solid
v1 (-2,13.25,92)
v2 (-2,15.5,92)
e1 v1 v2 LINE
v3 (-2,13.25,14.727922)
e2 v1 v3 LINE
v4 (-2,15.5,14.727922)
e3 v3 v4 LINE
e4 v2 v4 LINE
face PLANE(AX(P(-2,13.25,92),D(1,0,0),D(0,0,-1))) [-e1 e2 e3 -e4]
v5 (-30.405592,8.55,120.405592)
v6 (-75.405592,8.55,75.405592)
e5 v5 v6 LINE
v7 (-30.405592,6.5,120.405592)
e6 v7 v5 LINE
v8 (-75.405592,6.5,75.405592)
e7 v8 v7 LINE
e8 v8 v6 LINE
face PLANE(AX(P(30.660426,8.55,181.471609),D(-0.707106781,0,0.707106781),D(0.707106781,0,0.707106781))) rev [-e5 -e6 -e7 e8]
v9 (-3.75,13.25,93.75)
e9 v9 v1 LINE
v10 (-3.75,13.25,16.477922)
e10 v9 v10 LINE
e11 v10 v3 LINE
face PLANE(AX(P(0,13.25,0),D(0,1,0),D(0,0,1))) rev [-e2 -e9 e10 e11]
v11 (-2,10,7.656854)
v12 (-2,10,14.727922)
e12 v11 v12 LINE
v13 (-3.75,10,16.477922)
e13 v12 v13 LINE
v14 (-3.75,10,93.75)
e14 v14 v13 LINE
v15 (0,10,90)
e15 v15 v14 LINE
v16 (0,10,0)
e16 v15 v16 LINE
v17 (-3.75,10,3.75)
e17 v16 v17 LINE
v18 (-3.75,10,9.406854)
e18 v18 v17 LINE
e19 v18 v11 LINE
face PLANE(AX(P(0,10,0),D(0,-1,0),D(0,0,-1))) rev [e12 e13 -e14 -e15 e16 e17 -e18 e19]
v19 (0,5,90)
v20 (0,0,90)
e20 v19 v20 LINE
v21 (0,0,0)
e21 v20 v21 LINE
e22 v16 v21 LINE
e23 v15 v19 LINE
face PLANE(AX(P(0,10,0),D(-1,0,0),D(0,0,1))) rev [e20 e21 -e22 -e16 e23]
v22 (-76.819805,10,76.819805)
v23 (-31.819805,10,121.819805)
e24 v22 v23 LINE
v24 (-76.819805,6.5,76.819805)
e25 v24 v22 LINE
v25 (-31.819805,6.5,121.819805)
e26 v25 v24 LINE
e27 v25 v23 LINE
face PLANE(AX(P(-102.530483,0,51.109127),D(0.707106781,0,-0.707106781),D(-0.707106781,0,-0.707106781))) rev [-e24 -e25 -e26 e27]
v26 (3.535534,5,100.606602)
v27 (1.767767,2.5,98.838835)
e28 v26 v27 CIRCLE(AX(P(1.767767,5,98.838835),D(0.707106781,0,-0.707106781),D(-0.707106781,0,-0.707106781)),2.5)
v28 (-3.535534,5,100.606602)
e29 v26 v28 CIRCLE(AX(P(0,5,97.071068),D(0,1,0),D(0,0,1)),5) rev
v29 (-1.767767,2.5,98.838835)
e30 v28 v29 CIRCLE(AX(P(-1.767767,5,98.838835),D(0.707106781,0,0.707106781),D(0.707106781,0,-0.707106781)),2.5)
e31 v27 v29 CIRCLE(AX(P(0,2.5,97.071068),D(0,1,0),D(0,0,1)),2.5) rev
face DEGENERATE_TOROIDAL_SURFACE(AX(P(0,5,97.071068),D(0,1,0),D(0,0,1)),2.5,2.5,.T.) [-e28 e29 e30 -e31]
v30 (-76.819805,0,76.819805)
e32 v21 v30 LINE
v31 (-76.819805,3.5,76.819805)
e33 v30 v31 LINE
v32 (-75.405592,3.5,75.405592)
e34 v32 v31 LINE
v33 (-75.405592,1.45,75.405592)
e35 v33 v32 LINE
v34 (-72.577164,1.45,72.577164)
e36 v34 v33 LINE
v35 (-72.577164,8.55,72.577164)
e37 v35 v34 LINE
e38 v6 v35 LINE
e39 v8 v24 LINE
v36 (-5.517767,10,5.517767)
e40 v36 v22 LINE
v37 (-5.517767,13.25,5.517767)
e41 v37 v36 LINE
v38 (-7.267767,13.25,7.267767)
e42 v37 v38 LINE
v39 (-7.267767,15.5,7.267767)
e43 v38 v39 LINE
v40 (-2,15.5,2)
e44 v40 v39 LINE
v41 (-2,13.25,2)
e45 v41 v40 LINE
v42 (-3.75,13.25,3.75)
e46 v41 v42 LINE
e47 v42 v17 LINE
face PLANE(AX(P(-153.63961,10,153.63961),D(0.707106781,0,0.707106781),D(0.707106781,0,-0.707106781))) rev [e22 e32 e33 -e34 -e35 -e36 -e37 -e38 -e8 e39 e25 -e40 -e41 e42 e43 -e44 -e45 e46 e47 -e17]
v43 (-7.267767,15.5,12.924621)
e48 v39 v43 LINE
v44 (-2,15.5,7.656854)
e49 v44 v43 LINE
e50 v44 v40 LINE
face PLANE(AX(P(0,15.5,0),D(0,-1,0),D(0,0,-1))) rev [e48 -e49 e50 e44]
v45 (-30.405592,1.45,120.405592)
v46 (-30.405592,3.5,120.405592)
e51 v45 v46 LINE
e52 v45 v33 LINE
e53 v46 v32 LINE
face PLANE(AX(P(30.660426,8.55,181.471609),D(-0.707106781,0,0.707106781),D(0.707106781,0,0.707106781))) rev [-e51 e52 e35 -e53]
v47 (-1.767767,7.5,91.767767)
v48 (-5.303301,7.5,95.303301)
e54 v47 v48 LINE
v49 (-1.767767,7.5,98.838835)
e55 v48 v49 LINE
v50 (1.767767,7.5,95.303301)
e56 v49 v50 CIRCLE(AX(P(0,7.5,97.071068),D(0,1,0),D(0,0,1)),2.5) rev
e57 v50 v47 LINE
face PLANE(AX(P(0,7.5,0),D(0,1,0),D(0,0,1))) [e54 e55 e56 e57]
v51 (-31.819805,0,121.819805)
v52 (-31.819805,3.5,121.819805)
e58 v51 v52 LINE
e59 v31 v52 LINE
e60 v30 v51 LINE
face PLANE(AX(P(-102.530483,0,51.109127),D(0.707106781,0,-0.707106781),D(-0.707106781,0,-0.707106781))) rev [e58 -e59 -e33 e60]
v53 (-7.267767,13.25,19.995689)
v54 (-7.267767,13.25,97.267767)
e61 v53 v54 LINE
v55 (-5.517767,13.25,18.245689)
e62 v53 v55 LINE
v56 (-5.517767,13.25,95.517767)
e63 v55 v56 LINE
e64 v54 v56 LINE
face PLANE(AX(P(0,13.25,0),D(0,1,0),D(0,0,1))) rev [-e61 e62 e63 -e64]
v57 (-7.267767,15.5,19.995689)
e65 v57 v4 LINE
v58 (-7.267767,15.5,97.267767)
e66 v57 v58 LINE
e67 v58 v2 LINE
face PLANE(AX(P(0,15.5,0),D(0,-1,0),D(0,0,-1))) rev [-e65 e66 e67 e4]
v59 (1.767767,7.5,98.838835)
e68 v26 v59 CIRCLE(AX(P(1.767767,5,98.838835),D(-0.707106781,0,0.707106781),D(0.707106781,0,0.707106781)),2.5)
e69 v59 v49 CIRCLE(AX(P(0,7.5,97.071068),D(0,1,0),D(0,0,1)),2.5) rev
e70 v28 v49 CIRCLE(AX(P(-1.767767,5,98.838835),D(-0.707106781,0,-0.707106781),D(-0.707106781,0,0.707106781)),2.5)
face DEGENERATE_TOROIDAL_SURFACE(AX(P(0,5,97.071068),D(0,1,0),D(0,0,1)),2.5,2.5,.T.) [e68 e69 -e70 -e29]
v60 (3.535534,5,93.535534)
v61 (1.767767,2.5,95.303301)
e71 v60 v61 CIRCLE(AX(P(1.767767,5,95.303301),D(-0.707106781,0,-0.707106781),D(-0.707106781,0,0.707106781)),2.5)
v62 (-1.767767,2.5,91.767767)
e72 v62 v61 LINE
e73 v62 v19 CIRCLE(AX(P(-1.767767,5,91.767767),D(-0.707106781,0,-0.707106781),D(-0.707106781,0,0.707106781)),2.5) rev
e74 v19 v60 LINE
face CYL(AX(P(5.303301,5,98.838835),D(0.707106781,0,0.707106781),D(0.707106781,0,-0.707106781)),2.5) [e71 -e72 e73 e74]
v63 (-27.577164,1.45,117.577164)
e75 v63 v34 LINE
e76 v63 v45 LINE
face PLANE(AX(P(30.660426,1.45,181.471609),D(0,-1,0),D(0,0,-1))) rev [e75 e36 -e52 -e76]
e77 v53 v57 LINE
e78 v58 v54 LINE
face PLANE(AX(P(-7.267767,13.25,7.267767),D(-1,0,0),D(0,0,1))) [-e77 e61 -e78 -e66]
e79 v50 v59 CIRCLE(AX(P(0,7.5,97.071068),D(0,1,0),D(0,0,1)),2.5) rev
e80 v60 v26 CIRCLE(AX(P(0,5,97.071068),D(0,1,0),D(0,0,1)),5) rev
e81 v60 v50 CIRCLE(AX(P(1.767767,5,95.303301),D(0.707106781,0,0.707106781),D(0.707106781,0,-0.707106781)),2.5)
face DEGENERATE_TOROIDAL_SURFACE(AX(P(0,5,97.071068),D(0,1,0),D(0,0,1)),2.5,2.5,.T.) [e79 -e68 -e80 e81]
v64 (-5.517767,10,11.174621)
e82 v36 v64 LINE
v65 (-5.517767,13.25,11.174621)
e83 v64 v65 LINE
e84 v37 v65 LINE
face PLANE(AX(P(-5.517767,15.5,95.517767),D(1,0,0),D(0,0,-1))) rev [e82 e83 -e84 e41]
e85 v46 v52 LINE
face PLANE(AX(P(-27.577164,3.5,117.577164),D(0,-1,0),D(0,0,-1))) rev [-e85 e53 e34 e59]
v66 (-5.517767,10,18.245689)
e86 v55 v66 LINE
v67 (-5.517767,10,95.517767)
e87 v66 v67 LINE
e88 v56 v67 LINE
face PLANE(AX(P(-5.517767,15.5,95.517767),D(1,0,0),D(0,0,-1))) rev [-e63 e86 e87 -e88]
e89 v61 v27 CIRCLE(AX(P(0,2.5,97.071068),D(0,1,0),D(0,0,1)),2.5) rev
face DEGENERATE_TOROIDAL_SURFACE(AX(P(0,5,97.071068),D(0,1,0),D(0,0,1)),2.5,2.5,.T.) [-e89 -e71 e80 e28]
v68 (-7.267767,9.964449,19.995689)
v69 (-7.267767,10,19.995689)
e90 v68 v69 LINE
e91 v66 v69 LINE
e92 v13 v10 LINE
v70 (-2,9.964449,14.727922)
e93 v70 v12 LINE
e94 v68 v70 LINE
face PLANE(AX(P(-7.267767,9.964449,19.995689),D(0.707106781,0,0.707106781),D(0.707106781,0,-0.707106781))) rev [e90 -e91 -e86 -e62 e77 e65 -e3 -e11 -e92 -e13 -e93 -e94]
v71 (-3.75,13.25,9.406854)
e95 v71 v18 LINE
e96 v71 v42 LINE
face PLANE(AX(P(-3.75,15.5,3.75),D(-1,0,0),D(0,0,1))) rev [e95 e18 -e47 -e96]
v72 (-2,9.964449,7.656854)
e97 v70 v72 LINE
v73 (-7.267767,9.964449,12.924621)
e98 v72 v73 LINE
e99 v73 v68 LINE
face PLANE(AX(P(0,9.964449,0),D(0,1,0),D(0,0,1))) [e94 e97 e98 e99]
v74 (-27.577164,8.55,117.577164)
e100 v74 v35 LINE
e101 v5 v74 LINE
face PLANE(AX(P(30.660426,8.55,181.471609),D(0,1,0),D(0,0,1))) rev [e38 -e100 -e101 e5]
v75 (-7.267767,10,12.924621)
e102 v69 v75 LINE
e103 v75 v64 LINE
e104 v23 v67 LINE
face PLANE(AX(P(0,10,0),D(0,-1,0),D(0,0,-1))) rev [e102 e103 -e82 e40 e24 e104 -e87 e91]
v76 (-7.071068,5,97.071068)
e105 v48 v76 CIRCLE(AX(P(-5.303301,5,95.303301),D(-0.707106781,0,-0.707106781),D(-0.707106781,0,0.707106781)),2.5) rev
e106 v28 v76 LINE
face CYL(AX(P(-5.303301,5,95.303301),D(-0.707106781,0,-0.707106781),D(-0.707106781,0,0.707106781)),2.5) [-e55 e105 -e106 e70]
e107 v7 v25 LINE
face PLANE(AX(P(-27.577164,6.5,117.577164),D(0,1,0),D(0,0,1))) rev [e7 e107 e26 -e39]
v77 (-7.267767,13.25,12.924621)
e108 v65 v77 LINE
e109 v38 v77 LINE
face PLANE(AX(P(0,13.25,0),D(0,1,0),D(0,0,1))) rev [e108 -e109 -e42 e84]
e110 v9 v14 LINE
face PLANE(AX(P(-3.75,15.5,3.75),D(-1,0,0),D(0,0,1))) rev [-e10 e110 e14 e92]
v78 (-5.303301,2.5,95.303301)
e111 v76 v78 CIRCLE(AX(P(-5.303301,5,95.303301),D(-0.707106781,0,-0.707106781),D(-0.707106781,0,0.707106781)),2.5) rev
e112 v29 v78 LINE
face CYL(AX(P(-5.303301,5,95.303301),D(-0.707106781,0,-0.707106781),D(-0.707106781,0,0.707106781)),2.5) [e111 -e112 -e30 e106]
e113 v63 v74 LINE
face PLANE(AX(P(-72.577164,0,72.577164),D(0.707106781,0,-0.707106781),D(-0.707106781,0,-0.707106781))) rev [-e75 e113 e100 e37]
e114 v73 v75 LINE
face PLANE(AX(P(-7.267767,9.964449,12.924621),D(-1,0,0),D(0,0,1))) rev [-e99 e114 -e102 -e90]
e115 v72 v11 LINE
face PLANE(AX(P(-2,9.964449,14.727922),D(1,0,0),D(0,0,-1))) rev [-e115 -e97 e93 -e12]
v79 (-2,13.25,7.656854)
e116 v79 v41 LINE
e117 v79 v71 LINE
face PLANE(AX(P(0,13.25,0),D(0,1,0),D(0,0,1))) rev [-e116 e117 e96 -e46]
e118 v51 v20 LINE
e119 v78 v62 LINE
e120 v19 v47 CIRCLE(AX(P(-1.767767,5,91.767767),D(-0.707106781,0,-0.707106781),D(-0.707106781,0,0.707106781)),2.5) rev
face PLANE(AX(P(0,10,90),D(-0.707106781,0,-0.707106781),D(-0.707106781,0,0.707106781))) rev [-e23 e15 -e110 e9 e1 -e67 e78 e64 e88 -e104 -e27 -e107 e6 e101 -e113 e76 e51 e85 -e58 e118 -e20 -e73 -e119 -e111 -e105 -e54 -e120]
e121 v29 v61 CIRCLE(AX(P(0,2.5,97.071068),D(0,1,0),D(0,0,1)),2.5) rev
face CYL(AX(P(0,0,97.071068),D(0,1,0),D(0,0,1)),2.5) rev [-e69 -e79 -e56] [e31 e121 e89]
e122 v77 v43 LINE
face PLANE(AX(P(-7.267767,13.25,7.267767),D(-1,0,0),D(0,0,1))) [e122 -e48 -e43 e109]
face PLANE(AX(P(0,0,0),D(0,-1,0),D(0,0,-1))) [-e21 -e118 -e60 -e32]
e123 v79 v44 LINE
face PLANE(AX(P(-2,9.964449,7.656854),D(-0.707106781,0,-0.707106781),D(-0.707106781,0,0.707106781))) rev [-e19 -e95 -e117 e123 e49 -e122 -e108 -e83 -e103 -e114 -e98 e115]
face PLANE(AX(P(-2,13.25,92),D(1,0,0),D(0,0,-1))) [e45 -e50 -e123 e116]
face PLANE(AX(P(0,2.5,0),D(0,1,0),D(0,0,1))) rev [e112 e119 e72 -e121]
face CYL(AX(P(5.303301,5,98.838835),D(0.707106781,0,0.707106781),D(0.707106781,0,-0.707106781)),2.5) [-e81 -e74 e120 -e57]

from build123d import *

# Parameters (mm, degrees)
BOSS_EXTRUDE1_DEPTH = 10
BOSS_EXTRUDE2_DEPTH = 5.5
BOSS_EXTRUDE4_DEPTH = 2.25
SKETCH5_W           = 167.071716414
SKETCH5_H           = 54.025930679
CUT_EXTRUDE1_DEPTH  = 100
BOSS_EXTRUDE5_DEPTH = 5.5
BOSS_EXTRUDE6_DEPTH = 2.25
CUT_EXTRUDE2_DEPTH  = 2.25
CUT_EXTRUDE3_DEPTH  = 5.5
CUT_EXTRUDE4_DEPTH  = 5.5
CUT_EXTRUDE5_DEPTH  = 5.5
CUT_EXTRUDE6_DEPTH  = 5.5
SKETCH14_W          = 63.639610307
SKETCH14_H          = 3
CUT_EXTRUDE7_DEPTH  = 6
SKETCH15_W          = 4
SKETCH15_H          = 7.1
CUT_EXTRUDE8_DEPTH  = 150
SKETCH16_W          = 18.586901627
SKETCH16_H          = 5.5
CUT_EXTRUDE9_DEPTH  = 34
SKETCH17_W          = 2.5
SKETCH17_H          = 5.5
CUT_EXTRUDE10_DEPTH = 34
SKETCH18_W          = 1.498020702
SKETCH18_H          = 5.5
CUT_EXTRUDE11_DEPTH = 34
SKETCH19_W          = 3.248020701
SKETCH19_H          = 2.25
CUT_EXTRUDE12_DEPTH = 34
BOSS_EXTRUDE7_DEPTH = 10
SKETCH21_R          = 2.5
CUT_EXTRUDE13_DEPTH = 10
FILLET1_R           = 5
FILLET2_R           = 5
CUT_EXTRUDE14_DEPTH = 2.5
CUT_EXTRUDE15_DEPTH = 2.5
FILLET6_R           = 2.5
FILLET7_R           = 2.5
CUT_EXTRUDE16_DEPTH = 10
CUT_EXTRUDE17_DEPTH = 5.535550905
SKETCH26_W          = 38.089982304
SKETCH26_H          = 10
BOSS_EXTRUDE8_DEPTH = 50


with BuildPart() as part:
    # Sketch1 → Boss-Extrude1 (new body)
    with BuildSketch(Plane(origin=(0, 0, 0), x_dir=(1, 0, 0), z_dir=(0, 1, 0))):
        Polygon((0, 0), (0, -90), (-63.639610307, -153.639610307), (-153.639610307, -153.639610307), align=None)
    extrude(amount=BOSS_EXTRUDE1_DEPTH)

    # Sketch3 → Boss-Extrude2 (add)
    with BuildSketch(Plane(origin=(0, 10, 0), x_dir=(1, 0, 0), z_dir=(0, 1, 0))):
        Polygon((-3.75, -3.75), (-3.75, -93.75), (-5.517766953, -95.517766953), (-5.517766953, -5.517766953), align=None)
    extrude(amount=BOSS_EXTRUDE2_DEPTH)

    # Sketch4 → Boss-Extrude4 (add)
    with BuildSketch(Plane(origin=(0, 15.5, 0), x_dir=(1, 0, 0), z_dir=(0, 1, 0))):
        Polygon((-3.75, -93.75), (-2, -92), (-2, -2), (-7.267766953, -7.267766953), (-7.267766953, -97.267766953), align=None)
    extrude(amount=-BOSS_EXTRUDE4_DEPTH)

    # Sketch5 → Cut-Extrude1 (cut)
    with BuildSketch(Plane(origin=(45, 0, 45), x_dir=(0.7071067811865487, 0, -0.7071067811865464), z_dir=(0.7071067811865464, 0, 0.7071067811865487))):
        with Locations((-192.175468514, 27.01296534)):
            Rectangle(SKETCH5_W, SKETCH5_H)
    extrude(amount=-CUT_EXTRUDE1_DEPTH, mode=Mode.SUBTRACT)

    # Sketch6 → Boss-Extrude5 (add)
    with BuildSketch(Plane(origin=(0, 10, 0), x_dir=(1, 0, 0), z_dir=(0, 1, 0))):
        Polygon((-7.267766953, -97.267766953), (-27.267766953, -97.267766953), (-41.819805153, -111.819805153), (-43.587572106, -110.0520382), (-28.303300859, -94.767766953), (-7.267766953, -94.767766953), align=None)
    extrude(amount=BOSS_EXTRUDE5_DEPTH)

    # Sketch7 → Boss-Extrude6 (add)
    with BuildSketch(Plane(origin=(0, 15.5, 0), x_dir=(1, 0, 0), z_dir=(0, 1, 0))):
        Polygon((-7.267766953, -94.767766953), (-7.267766953, -93.017766953), (-29.028174593, -93.017766953), (-44.822087786, -108.811680146), (-40.579447099, -113.054320833), (-26.542893219, -99.017766953), (-7.267766953, -99.017766953), align=None)
    extrude(amount=-BOSS_EXTRUDE6_DEPTH)

    # Sketch8 → Cut-Extrude2 (cut)
    with BuildSketch(Plane(origin=(0, 15.5, 0), x_dir=(1, 0, 0), z_dir=(0, 1, 0))):
        Polygon((-7.267766953, -97.267766953), (-9.017766953, -99.017766953), (-6.756511784, -101.279022122), (-4.757663026, -99.017766953), align=None)
    extrude(amount=-CUT_EXTRUDE2_DEPTH, mode=Mode.SUBTRACT)

    # Sketch9 → Cut-Extrude3 (cut)
    with BuildSketch(Plane(origin=(0, 15.5, 0), x_dir=(1, 0, 0), z_dir=(0, 1, 0))):
        Polygon((-29.028174593, -93.017766953), (-26.542893219, -99.017766953), (-24.410661726, -99.017766953), (-18.410661726, -93.017766953), align=None)
    extrude(amount=-CUT_EXTRUDE3_DEPTH, mode=Mode.SUBTRACT)

    # Sketch10 → Cut-Extrude4 (cut)
    with BuildSketch(Plane(origin=(0, 15.5, 0), x_dir=(1, 0, 0), z_dir=(0, 1, 0))):
        Polygon((-26.542893219, -99.017766953), (-28.439849815, -100.914723549), (-36.92513119, -100.914723549), (-29.028174593, -93.017766953), align=None)
    extrude(amount=-CUT_EXTRUDE4_DEPTH, mode=Mode.SUBTRACT)

    # Sketch11 → Cut-Extrude5 (cut)
    with BuildSketch(Plane(origin=(0, 15.5, 0), x_dir=(1, 0, 0), z_dir=(0, 1, 0))):
        Polygon((-23.159902577, -99.017766953), (-17.159902577, -93.017766953), (-18.410661726, -93.017766953), (-24.410661726, -99.017766953), align=None)
    extrude(amount=-CUT_EXTRUDE5_DEPTH, mode=Mode.SUBTRACT)

    # Sketch13 → Cut-Extrude6 (cut)
    with BuildSketch(Plane(origin=(0, 15.5, 0), x_dir=(1, 0, 0), z_dir=(0, 1, 0))):
        Polygon((-7.267766953, -93.017766953), (-7.267766953, -97.267766953), (-7.267766953, -100.891740466), (-9.284719157, -100.891740466), (-9.284719157, -93.017766953), align=None)
    extrude(amount=-CUT_EXTRUDE6_DEPTH, mode=Mode.SUBTRACT)

    # Sketch14 → Cut-Extrude7 (cut)
    with BuildSketch(Plane(origin=(-76.819805153, 0, 76.819805153), x_dir=(0.7071067811865465, 0, 0.7071067811865487), z_dir=(-0.7071067811865487, 0, 0.7071067811865465))):
        with Locations((31.819805154, 5)):
            Rectangle(SKETCH14_W, SKETCH14_H)
    extrude(amount=-CUT_EXTRUDE7_DEPTH, mode=Mode.SUBTRACT)

    # Sketch15 → Cut-Extrude8 (cut)
    with BuildSketch(Plane(origin=(0, 0, 0), x_dir=(-0.7071067811865434, 0, 0.7071067811865517), z_dir=(-0.7071067811865517, 0, -0.7071067811865434))):
        with Locations((104.639610307, 5)):
            Rectangle(SKETCH15_W, SKETCH15_H)
    extrude(amount=-CUT_EXTRUDE8_DEPTH, mode=Mode.SUBTRACT)

    # Sketch16 → Cut-Extrude9 (cut)
    with BuildSketch(Plane(origin=(-76.816883966, 0, 76.816883966), x_dir=(0.7071067811865475, 0, 0.7071067811865477), z_dir=(-0.7071067811865477, 0, 0.7071067811865475))):
        with Locations((54.540925497, 12.75)):
            Rectangle(SKETCH16_W, SKETCH16_H)
    extrude(amount=-CUT_EXTRUDE9_DEPTH, mode=Mode.SUBTRACT)

    # Sketch17 → Cut-Extrude10 (cut)
    with BuildSketch(Plane(origin=(-76.819805153, 0, 76.819805153), x_dir=(0.7071067811865465, 0, 0.7071067811865487), z_dir=(-0.7071067811865487, 0, 0.7071067811865465))):
        with Locations((48.247474683, 12.75)):
            Rectangle(SKETCH17_W, SKETCH17_H)
    extrude(amount=-CUT_EXTRUDE10_DEPTH, mode=Mode.SUBTRACT)

    # Sketch18 → Cut-Extrude11 (cut)
    with BuildSketch(Plane(origin=(-9.284719157, 0, 0), x_dir=(0, 0, -1), z_dir=(1, 0, 0))):
        with Locations((-95.516777304, 12.75)):
            Rectangle(SKETCH18_W, SKETCH18_H)
    extrude(amount=-CUT_EXTRUDE11_DEPTH, mode=Mode.SUBTRACT)


with BuildPart() as cut_extrude11_piece_1:
    # of the separate pieces the step leaves, piece 1, a body of its own (cut_extrude11_pieces)
    add(part.part.solids().sort_by_distance((0, 0, 0))[0])

    # Sketch20 → Boss-Extrude7 (add)
    with BuildSketch(Plane(origin=(0, 10, 0), x_dir=(1, 0, 0), z_dir=(0, 1, 0))):
        Polygon((0, -90), (-7.071067812, -97.071067812), (0, -104.142135624), (7.071067812, -97.071067812), align=None)
    extrude(amount=-BOSS_EXTRUDE7_DEPTH)

    # Sketch21 → Cut-Extrude13 (cut)
    with BuildSketch(Plane(origin=(0, 10, 0), x_dir=(1, 0, 0), z_dir=(0, 1, 0))):
        with Locations(Location((0, -97.071067812, 0), (0, 0, 270))):
            Circle(SKETCH21_R)
    extrude(amount=-CUT_EXTRUDE13_DEPTH, mode=Mode.SUBTRACT)

    # Fillet1
    fillet1_edges = [cut_extrude11_piece_1.edges().sort_by_distance(p)[0] for p in [
        (7.071067812, 5, 97.071067812),
    ]]
    fillet(fillet1_edges, radius=FILLET1_R)

    # Fillet2
    fillet2_edges = [cut_extrude11_piece_1.edges().sort_by_distance(p)[0] for p in [
        (0, 5, 104.142135624),
    ]]
    fillet(fillet2_edges, radius=FILLET2_R - 0.0001)  # a hair under: the kernel refuses the full size

    # Sketch22 → Cut-Extrude14 (cut)
    with BuildSketch(Plane(origin=(0, 10, 0), x_dir=(1, 0, 0), z_dir=(0, 1, 0))):
        Polygon((0, -90), (-7.071067812, -97.071067812), (5.303300859, -109.445436483), (12.374368671, -102.374368671), align=None)
    extrude(amount=-CUT_EXTRUDE14_DEPTH, mode=Mode.SUBTRACT)

    # Sketch23 → Cut-Extrude15 (cut)
    with BuildSketch(Plane(origin=(0, 0, 0), x_dir=(-1, 0, 0), z_dir=(0, -1, 0))):
        Polygon((0, -90), (7.071067812, -97.071067812), (-2.948055245, -107.090190869), (-10.019123057, -100.019123057), align=None)
    extrude(amount=-CUT_EXTRUDE15_DEPTH, mode=Mode.SUBTRACT)

    # Fillet6
    fillet6_edges = [cut_extrude11_piece_1.edges().sort_by_distance(p)[0] for p in [
        (-5.303265504, 7.5, 98.83887012),
        (1.767766953, 7.5, 91.767766953),
        (0, 7.5, 102.071109233),
    ]]
    fillet(fillet6_edges, radius=FILLET6_R - 0.0001)  # a hair under: the kernel refuses the full size

    # Fillet7
    fillet7_edges = [cut_extrude11_piece_1.edges().sort_by_distance(p)[0] for p in [
        (1.767766953, 2.5, 91.767766953),
        (-5.303265504, 2.5, 98.83887012),
        (0, 2.5, 102.071109233),
    ]]
    fillet(fillet7_edges, radius=FILLET7_R - 0.0001)  # a hair under: the kernel refuses the full size

    # Sketch24 → Cut-Extrude16 (cut)
    with BuildSketch(Plane(origin=(0, 10, 0), x_dir=(1, 0, 0), z_dir=(0, 1, 0))):
        with BuildLine():
            Line((-24.973066028, -85.839611094), (-10.945777457, -85.839611094))
            ThreePointArc((-10.945777457, -85.839611094), (-8.23469039, -83.128524027), (-10.945777457, -80.417436961))
            Line((-10.945777457, -80.417436961), (-25.516199237, -80.417436961))
            ThreePointArc((-25.516199237, -80.417436961), (-23.520394737, -82.394976475), (-24.243415571, -85.109960637))
            Line((-24.243415571, -85.109960637), (-24.973066028, -85.839611094))
        make_face()
        with BuildLine():
            Line((-38.387291027, -99.253836092), (-24.973066028, -85.839611094))
            Line((-24.973066028, -85.839611094), (-26.224852181, -85.839611094))
            ThreePointArc((-26.224852181, -85.839611094), (-28.935939248, -83.128524027), (-26.224852181, -80.417436961))
            Line((-26.224852181, -80.417436961), (-25.516199237, -80.417436961))
            ThreePointArc((-25.516199237, -80.417436961), (-26.958399734, -80.424066583), (-28.206288791, -81.147087417))
            Line((-28.206288791, -81.147087417), (-42.350164246, -95.290962873))
            ThreePointArc((-42.350164246, -95.290962873), (-42.350164246, -99.253836092), (-38.387291027, -99.253836092))
        make_face()
        with BuildLine():
            Line((-26.224852181, -85.839611094), (-24.973066028, -85.839611094))
            Line((-24.973066028, -85.839611094), (-24.243415571, -85.109960637))
            ThreePointArc((-24.243415571, -85.109960637), (-23.520394737, -82.394976475), (-25.516199237, -80.417436961))
            Line((-25.516199237, -80.417436961), (-26.224852181, -80.417436961))
            ThreePointArc((-26.224852181, -80.417436961), (-28.935939248, -83.128524027), (-26.224852181, -85.839611094))
        make_face()
    extrude(amount=-CUT_EXTRUDE16_DEPTH, mode=Mode.SUBTRACT)

    # Sketch25 → Cut-Extrude17 (cut)
    with BuildSketch(Plane(origin=(0, 15.5, 0), x_dir=(1, 0, 0), z_dir=(0, 1, 0))):
        Polygon((-2, -7.656854249), (-7.267766953, -12.924621202), (-7.267766953, -19.995689014), (-2, -14.727922061), align=None)
    extrude(amount=-CUT_EXTRUDE17_DEPTH, mode=Mode.SUBTRACT)

    # Sketch26 → Boss-Extrude8 (add)
    with BuildSketch(Plane(origin=(45, 0, 45), x_dir=(0.7071067811865487, 0, -0.7071067811865464), z_dir=(0.7071067811865464, 0, 0.7071067811865487))):
        with Locations((-82.684601459, 5)):
            Rectangle(SKETCH26_W, SKETCH26_H)
    extrude(amount=-BOSS_EXTRUDE8_DEPTH)


with BuildPart() as cut_extrude11_piece_2:
    # of the separate pieces the step leaves, piece 2, a body of its own (cut_extrude11_pieces)
    add(part.part.solids().sort_by_distance((-10.782739858, 13.25, 94.767766953))[0])

    # Sketch19 → Cut-Extrude12 (cut)
    with BuildSketch(Plane(origin=(0, 0, 93.017766953), x_dir=(-1, 0, 0), z_dir=(0, 0, -1))):
        with Locations((10.908729508, 14.375)):
            Rectangle(SKETCH19_W, SKETCH19_H)
    extrude(amount=-CUT_EXTRUDE12_DEPTH, mode=Mode.SUBTRACT)


solid = cut_extrude11_piece_1.part
